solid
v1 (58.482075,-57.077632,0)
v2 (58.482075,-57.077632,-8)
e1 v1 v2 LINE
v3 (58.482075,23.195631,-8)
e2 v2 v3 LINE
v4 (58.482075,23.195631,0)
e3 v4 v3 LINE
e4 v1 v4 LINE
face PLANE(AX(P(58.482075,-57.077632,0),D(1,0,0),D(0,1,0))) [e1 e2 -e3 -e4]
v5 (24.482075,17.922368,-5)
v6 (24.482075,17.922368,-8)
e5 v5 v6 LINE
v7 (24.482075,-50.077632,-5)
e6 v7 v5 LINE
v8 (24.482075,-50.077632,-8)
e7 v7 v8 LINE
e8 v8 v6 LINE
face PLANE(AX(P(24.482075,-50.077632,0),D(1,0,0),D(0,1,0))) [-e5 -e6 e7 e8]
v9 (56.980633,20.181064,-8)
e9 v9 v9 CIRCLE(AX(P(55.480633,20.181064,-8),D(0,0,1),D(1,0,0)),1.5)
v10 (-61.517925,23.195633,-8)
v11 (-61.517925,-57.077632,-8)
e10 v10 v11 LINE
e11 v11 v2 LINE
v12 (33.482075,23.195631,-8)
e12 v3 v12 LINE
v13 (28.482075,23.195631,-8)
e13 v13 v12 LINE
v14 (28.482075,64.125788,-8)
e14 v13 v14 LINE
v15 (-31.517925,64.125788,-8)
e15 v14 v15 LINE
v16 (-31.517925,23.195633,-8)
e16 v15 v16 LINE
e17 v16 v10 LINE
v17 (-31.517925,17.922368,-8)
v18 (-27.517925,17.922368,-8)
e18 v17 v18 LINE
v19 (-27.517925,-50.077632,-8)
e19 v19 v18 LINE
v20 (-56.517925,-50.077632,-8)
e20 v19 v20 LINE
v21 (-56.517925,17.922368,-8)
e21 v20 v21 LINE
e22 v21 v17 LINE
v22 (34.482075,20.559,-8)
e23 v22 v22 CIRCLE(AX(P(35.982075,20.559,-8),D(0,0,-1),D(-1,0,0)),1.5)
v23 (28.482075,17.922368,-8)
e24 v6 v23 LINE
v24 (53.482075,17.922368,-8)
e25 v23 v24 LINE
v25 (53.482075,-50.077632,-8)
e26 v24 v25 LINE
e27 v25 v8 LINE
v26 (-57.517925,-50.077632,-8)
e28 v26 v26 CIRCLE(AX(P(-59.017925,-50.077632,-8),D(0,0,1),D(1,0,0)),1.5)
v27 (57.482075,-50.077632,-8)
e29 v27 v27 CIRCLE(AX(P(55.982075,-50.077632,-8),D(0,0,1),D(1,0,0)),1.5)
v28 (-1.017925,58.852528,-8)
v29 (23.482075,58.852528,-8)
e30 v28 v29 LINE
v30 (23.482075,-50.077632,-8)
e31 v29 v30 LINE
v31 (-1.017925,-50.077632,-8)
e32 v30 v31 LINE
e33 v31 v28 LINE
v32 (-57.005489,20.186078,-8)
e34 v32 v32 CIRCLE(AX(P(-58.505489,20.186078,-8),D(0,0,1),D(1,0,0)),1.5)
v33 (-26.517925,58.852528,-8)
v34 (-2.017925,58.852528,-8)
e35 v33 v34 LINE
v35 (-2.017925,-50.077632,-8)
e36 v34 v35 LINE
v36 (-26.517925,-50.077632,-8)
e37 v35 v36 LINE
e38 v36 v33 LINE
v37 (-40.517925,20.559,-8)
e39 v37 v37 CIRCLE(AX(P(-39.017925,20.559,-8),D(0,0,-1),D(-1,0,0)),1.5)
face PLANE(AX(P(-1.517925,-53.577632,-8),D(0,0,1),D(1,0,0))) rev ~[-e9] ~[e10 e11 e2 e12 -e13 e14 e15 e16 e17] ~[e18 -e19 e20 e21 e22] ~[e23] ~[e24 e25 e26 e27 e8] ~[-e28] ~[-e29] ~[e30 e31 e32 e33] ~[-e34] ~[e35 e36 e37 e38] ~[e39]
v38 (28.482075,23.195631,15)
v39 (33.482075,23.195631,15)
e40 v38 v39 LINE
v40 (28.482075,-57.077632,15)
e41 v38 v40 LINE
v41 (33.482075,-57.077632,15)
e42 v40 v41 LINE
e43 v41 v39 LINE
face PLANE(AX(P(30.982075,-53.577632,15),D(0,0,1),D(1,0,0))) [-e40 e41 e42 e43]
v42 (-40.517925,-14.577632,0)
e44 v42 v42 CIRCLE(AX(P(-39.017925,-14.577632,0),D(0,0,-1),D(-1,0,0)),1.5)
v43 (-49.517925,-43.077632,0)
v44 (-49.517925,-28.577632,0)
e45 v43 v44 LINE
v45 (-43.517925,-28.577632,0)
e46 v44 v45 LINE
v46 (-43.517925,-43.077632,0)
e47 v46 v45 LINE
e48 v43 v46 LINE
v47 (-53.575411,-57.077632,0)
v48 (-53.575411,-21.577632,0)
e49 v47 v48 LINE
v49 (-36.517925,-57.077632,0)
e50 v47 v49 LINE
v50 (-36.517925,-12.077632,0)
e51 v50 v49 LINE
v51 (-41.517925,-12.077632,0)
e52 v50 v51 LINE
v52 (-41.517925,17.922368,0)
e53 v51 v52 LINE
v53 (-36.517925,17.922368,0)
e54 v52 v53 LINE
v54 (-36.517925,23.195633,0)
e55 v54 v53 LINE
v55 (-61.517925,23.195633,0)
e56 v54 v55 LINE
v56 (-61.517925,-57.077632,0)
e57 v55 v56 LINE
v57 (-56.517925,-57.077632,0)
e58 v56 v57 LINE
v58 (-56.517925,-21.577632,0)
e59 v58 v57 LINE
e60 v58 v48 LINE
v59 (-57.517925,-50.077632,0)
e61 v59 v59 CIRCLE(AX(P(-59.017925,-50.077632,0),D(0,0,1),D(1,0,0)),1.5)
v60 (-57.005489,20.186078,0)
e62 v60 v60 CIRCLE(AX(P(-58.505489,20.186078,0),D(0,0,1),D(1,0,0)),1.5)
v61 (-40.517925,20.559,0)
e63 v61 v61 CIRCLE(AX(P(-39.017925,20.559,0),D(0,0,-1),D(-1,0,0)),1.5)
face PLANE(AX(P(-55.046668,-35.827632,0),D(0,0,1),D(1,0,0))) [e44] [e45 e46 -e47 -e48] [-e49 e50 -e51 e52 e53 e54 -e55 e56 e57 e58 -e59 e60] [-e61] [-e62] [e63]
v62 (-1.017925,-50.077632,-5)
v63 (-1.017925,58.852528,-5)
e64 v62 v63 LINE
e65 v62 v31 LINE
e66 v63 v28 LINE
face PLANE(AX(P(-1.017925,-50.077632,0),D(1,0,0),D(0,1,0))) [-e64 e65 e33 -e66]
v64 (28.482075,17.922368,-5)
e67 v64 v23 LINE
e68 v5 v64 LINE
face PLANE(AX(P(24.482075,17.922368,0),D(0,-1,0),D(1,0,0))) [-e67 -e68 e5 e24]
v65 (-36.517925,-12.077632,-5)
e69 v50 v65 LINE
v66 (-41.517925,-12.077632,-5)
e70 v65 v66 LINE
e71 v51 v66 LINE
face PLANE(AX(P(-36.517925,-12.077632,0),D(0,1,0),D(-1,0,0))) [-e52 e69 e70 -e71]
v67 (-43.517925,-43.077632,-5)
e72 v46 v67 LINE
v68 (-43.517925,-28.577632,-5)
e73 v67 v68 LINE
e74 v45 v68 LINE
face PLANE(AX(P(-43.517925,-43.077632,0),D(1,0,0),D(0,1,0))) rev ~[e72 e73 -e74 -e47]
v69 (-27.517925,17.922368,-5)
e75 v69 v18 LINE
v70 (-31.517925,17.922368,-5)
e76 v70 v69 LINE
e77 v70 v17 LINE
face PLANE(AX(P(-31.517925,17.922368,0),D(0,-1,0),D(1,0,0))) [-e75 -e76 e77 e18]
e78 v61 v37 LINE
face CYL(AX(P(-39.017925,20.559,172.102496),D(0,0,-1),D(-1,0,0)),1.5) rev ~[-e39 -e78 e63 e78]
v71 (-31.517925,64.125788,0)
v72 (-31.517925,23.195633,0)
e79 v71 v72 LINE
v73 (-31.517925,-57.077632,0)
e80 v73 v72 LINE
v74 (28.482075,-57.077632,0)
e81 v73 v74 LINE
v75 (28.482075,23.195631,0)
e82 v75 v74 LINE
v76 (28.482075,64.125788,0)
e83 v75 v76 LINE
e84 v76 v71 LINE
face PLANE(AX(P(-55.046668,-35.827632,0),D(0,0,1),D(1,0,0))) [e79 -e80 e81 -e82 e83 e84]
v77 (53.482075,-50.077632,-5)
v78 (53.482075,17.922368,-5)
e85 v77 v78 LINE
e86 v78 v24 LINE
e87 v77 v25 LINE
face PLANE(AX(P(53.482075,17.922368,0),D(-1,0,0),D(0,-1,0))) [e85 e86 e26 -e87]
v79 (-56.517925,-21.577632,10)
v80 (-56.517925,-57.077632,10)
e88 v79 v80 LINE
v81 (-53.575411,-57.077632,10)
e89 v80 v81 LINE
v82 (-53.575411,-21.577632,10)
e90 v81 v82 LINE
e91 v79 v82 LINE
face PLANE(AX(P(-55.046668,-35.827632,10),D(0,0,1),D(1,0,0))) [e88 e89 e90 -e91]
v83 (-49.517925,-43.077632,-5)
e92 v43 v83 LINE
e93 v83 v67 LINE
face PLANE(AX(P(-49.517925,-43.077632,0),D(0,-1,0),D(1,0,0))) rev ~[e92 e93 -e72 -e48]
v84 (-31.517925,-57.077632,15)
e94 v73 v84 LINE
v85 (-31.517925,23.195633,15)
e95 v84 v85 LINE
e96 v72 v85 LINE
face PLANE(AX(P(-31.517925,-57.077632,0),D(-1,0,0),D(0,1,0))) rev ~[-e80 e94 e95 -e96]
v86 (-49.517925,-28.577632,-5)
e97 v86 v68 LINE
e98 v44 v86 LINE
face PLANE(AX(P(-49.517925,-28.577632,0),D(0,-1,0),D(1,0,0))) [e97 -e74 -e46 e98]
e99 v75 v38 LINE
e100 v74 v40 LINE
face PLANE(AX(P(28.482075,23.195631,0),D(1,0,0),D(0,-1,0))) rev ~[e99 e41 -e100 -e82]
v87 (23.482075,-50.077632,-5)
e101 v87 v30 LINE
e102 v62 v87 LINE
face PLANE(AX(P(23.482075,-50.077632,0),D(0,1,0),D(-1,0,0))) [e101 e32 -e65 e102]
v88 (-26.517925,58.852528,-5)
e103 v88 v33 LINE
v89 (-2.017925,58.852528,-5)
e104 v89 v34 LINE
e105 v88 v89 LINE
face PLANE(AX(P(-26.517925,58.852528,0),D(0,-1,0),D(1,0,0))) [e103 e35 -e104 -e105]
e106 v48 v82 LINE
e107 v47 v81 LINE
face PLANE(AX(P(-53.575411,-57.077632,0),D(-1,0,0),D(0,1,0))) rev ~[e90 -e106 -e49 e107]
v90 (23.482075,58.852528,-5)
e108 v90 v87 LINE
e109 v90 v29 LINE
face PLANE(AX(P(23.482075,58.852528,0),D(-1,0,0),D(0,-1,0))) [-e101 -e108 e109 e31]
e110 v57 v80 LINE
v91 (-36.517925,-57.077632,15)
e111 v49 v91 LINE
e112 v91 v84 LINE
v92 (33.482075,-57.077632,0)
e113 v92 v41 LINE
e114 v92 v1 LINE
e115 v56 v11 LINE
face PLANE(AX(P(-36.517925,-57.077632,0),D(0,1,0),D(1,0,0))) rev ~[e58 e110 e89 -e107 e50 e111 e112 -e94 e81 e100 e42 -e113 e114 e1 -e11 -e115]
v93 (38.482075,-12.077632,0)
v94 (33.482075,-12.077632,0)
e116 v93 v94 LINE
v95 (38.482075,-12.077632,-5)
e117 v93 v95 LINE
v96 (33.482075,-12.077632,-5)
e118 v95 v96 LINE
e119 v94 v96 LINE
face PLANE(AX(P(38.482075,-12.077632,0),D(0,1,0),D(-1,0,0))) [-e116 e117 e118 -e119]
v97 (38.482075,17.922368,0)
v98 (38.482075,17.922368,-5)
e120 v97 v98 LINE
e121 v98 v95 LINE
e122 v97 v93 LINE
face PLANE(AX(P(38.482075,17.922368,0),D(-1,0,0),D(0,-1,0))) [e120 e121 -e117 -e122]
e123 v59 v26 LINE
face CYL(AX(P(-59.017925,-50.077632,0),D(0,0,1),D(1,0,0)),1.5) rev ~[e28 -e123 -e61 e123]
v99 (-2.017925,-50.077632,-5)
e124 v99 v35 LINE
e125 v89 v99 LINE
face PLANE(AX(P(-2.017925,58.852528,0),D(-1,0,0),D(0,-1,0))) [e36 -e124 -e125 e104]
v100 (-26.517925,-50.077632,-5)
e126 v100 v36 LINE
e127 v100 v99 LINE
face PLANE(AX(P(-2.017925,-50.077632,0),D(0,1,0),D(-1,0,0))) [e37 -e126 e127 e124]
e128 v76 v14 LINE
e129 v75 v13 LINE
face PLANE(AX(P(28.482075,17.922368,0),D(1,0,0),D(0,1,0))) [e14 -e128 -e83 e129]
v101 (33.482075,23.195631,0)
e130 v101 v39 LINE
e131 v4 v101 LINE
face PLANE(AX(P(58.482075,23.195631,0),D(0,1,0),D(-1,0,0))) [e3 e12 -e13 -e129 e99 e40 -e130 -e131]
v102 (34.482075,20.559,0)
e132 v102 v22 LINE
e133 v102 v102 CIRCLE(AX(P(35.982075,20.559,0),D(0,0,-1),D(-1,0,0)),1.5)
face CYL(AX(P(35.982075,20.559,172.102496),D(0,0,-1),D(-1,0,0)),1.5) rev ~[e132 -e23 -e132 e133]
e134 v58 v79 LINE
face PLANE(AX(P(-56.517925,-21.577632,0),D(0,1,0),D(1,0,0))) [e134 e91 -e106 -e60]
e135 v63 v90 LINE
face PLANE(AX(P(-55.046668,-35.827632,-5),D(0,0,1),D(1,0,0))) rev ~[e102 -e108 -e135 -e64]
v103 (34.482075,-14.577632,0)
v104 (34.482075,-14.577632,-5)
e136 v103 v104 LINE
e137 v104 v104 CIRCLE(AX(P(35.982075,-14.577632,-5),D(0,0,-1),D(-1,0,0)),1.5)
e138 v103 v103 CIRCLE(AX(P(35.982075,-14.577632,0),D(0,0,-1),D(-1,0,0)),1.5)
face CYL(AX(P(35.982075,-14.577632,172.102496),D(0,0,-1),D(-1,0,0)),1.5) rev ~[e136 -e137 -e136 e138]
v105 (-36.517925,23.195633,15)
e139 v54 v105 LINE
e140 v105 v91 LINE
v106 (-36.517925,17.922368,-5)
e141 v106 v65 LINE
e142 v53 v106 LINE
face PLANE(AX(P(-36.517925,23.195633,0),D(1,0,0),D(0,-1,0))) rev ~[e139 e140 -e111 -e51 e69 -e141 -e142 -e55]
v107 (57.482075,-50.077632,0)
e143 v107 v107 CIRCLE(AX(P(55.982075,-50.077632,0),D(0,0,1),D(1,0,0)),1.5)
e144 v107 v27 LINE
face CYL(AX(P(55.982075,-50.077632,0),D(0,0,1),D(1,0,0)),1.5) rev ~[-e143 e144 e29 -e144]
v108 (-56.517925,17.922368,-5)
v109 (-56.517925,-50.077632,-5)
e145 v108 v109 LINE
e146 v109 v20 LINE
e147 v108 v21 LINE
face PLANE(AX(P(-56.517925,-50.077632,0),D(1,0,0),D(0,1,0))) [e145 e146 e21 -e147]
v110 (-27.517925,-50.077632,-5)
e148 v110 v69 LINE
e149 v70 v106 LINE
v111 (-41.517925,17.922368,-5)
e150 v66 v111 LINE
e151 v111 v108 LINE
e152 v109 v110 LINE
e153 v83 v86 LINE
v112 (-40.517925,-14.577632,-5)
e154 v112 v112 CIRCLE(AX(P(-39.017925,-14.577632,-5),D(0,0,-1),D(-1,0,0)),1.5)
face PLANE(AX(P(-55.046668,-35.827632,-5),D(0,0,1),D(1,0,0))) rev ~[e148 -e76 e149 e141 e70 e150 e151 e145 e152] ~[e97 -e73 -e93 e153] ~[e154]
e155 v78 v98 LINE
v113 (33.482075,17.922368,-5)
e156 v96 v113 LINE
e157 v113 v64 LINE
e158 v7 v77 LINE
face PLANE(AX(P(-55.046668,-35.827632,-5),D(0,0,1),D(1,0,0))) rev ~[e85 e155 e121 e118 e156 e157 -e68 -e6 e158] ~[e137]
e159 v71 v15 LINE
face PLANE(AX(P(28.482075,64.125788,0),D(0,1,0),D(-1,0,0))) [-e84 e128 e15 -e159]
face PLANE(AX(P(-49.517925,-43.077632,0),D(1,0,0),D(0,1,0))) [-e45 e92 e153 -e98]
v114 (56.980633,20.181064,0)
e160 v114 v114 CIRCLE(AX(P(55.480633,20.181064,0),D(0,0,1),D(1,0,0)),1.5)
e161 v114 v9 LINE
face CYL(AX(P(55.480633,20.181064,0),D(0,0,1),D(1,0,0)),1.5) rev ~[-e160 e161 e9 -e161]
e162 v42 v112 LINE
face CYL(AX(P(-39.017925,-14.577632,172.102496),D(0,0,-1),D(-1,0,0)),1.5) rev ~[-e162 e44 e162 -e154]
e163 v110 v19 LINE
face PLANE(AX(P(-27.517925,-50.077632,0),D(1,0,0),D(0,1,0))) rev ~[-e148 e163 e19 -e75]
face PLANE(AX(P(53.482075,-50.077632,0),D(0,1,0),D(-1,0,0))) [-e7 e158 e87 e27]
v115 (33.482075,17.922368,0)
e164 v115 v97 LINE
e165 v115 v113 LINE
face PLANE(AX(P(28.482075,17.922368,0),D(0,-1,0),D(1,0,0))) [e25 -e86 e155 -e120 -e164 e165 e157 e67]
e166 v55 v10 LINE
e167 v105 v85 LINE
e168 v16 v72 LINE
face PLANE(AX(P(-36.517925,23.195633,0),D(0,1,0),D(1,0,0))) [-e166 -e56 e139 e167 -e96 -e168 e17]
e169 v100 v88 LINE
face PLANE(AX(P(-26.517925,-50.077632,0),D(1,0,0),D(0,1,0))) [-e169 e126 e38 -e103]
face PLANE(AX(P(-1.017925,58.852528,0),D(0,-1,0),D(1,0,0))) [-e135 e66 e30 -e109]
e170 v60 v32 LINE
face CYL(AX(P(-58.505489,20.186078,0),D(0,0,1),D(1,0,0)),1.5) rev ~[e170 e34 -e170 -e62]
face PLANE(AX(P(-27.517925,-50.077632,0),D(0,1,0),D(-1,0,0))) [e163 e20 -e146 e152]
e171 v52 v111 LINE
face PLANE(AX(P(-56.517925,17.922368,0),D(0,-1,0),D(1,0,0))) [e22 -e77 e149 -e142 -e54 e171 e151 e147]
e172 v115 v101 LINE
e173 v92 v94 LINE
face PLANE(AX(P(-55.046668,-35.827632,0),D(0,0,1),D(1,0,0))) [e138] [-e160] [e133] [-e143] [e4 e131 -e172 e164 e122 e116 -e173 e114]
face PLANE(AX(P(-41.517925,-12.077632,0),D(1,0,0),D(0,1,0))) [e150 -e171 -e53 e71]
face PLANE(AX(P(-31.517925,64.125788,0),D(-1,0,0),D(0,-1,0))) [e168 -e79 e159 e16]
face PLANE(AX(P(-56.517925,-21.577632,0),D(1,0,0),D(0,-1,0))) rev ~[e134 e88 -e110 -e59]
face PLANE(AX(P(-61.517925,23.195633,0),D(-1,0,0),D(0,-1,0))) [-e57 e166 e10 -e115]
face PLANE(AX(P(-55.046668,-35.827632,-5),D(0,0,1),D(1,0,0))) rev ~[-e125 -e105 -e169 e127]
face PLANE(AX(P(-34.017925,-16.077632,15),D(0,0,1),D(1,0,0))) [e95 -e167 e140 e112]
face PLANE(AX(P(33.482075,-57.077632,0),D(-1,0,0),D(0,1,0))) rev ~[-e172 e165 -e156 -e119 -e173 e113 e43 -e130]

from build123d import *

# Parameters (mm, degrees)
F0_W     = 2.9425137265
F0_H     = 28.5
F0_W_2   = 6
F0_H_2   = 14.5
F0_W_3   = 4
F0_H_3   = 68
F0_W_4   = 1
F1_DEPTH = 5
F0_R     = 1.5
F0_W_5   = 5
F0_H_4   = 5.2732650286
F0_H_5   = 7
F0_W_6   = 17.0574862735
F0_H_6   = 5.2732627955
F2_DEPTH = 8
F3_DEPTH = 15
F4_DEPTH = 10
F5_D     = 3


# Not quite as in the source:
# - a feature names something its author has since deleted; it is built from what else it names


with BuildPart() as f1:
    # F0 (on Top) → F1 (new body)
    with BuildSketch(Plane.XY):
        with Locations((-55.0466683022, -35.8276315331)):
            Rectangle(F0_W, F0_H)
        Polygon((-53.5754114389, -21.5776315331), (-53.5754114389, -50.0776315331), (-36.5179251655, -50.0776315331), (-36.5179251655, -12.0776315331), (-41.5179251655, -12.0776315331), (-41.5179251655, 17.9223684669), (-56.5179251655, 17.9223684669), (-56.5179251655, -21.5776315331), align=None)
        with Locations((-46.5179251655, -35.8276315331)):
            Rectangle(F0_W_2, F0_H_2, mode=Mode.SUBTRACT)
        Polygon((-36.5179251655, -12.0776315331), (-36.5179251655, -50.0776315331), (-31.5179251655, -50.0776315331), (-31.5179251655, 17.9223684669), (-36.5179251655, 17.9223684669), align=None)
        with Locations((-29.5179251655, -16.0776315331)):
            Rectangle(F0_W_3, F0_H_3)
        with Locations((-27.0179251655, -16.0776315331)):
            Rectangle(F0_W_4, F0_H_3)
        Polygon((-31.5179251655, 23.1956334954), (-31.5179251655, 17.9223684669), (-27.5179251655, 17.9223684669), (-26.5179251655, 17.9223684669), (-26.5179251655, 58.8525284669), (-2.0179251655, 58.8525284669), (-1.5179251655, 58.8525284669), (-1.0179251655, 58.8525284669), (23.4820748345, 58.8525284669), (23.4820748345, 17.9223684669), (24.4820748345, 17.9223684669), (28.4820748345, 17.9223684669), (28.4820748345, 23.1956312623), (28.4820748345, 64.1257884669), (-31.5179251655, 64.1257884669), align=None)
        Polygon((-26.5179251655, 17.9223684669), (-26.5179251655, -50.0776315331), (-2.0179251655, -50.0776315331), (-2.0179251655, 58.8525284669), (-26.5179251655, 58.8525284669), align=None)
        Polygon((-2.0179251655, 58.8525284669), (-2.0179251655, -50.0776315331), (-1.0179251655, -50.0776315331), (-1.0179251655, 58.8525284669), (-1.5179251655, 58.8525284669), align=None)
        Polygon((28.4820748345, 17.9223684669), (28.4820748345, -50.0776315331), (33.4820748345, -50.0776315331), (33.4820748345, -17.0776315331), (33.4820748345, -12.0776315331), (33.4820748345, 17.9223684669), align=None)
        with Locations((26.4820748345, -16.0776315331)):
            Rectangle(F0_W_3, F0_H_3)
        Polygon((-1.0179251655, 58.8525284669), (-1.0179251655, -50.0776315331), (23.4820748345, -50.0776315331), (23.4820748345, 17.9223684669), (23.4820748345, 58.8525284669), align=None)
        Polygon((33.4820748345, -17.0776315331), (33.4820748345, -50.0776315331), (53.4820748345, -50.0776315331), (53.4820748345, 17.9223684669), (38.4820748345, 17.9223684669), (38.4820748345, -12.0776315331), (33.4820748345, -12.0776315331), align=None)
        with Locations((23.9820748345, -16.0776315331)):
            Rectangle(F0_W_4, F0_H_3)
    extrude(amount=-F1_DEPTH)

    # F0 (on Top) → F2 (join)
    with BuildSketch(Plane.XY):
        Polygon((-27.5179251655, -50.0776315331), (-31.5179251655, -50.0776315331), (-31.5179251655, -57.0776315331), (28.4820748345, -57.0776315331), (28.4820748345, -50.0776315331), (24.4820748345, -50.0776315331), (23.4820748345, -50.0776315331), (-1.0179251655, -50.0776315331), (-2.0179251655, -50.0776315331), (-26.5179251655, -50.0776315331), align=None)
        Polygon((-56.5179251655, -57.0776315331), (-56.5179251655, -50.0776315331), (-56.5179251655, -21.5776315331), (-56.5179251655, 17.9223684669), (-41.5179251655, 17.9223684669), (-36.5179251655, 17.9223684669), (-36.5179251655, 23.1956334954), (-61.5179251655, 23.1956334954), (-61.5179251655, -57.0776315331), align=None)
        with Locations((-59.0179251655, -50.0776315331)):
            Circle(F0_R, mode=Mode.SUBTRACT)
        with Locations((-58.5054894246, 20.1860783767)):
            Circle(F0_R, mode=Mode.SUBTRACT)
        Polygon((33.4820748345, -50.0776315331), (33.4820748345, -57.0776315331), (58.4820748345, -57.0776315331), (58.4820748345, 23.1956312623), (33.4820748345, 23.1956312623), (33.4820748345, 17.9223684669), (38.4820748345, 17.9223684669), (53.4820748345, 17.9223684669), (53.4820748345, -50.0776315331), align=None)
        with Locations((55.9820748345, -50.0776315331)):
            Circle(F0_R, mode=Mode.SUBTRACT)
        with Locations((55.4806331986, 20.1810636766)):
            Circle(F0_R, mode=Mode.SUBTRACT)
        with Locations((-34.0179251655, 20.5590009811)):
            Rectangle(F0_W_5, F0_H_4)
        with Locations((-55.0466683022, -53.5776315331)):
            Rectangle(F0_W, F0_H_5)
        with Locations((-45.0466683022, -53.5776315331)):
            Rectangle(F0_W_6, F0_H_5)
        with Locations((-34.0179251655, -53.5776315331)):
            Rectangle(F0_W_5, F0_H_5)
        with Locations((30.9820748345, -53.5776315331)):
            Rectangle(F0_W_5, F0_H_5)
        with Locations((-27.0179251655, -16.0776315331)):
            Rectangle(F0_W_4, F0_H_3)
        with Locations((23.9820748345, -16.0776315331)):
            Rectangle(F0_W_4, F0_H_3)
        Polygon((-2.0179251655, 58.8525284669), (-2.0179251655, -50.0776315331), (-1.0179251655, -50.0776315331), (-1.0179251655, 58.8525284669), (-1.5179251655, 58.8525284669), align=None)
        with Locations((30.9820748345, 20.5589998646)):
            Rectangle(F0_W_5, F0_H_6)
        with Locations((-34.0179251655, 20.5590009811)):
            Rectangle(F0_W_5, F0_H_4)
        Polygon((-31.5179251655, 23.1956334954), (-31.5179251655, 17.9223684669), (-27.5179251655, 17.9223684669), (-26.5179251655, 17.9223684669), (-26.5179251655, 58.8525284669), (-2.0179251655, 58.8525284669), (-1.5179251655, 58.8525284669), (-1.0179251655, 58.8525284669), (23.4820748345, 58.8525284669), (23.4820748345, 17.9223684669), (24.4820748345, 17.9223684669), (28.4820748345, 17.9223684669), (28.4820748345, 23.1956312623), (28.4820748345, 64.1257884669), (-31.5179251655, 64.1257884669), align=None)
        with Locations((30.9820748345, 20.5589998646)):
            Rectangle(F0_W_5, F0_H_6)
        with Locations((-34.0179251655, 20.5590009811)):
            Rectangle(F0_W_5, F0_H_4)
    extrude(amount=-F2_DEPTH)

    # F0 (on Top) → F3 (join)
    with BuildSketch(Plane.XY):
        Polygon((-36.5179251655, -12.0776315331), (-36.5179251655, -50.0776315331), (-31.5179251655, -50.0776315331), (-31.5179251655, 17.9223684669), (-36.5179251655, 17.9223684669), align=None)
        with Locations((-34.0179251655, -53.5776315331)):
            Rectangle(F0_W_5, F0_H_5)
        with Locations((-34.0179251655, 20.5590009811)):
            Rectangle(F0_W_5, F0_H_4)
        with Locations((30.9820748345, -53.5776315331)):
            Rectangle(F0_W_5, F0_H_5)
        Polygon((28.4820748345, 17.9223684669), (28.4820748345, -50.0776315331), (33.4820748345, -50.0776315331), (33.4820748345, -17.0776315331), (33.4820748345, -12.0776315331), (33.4820748345, 17.9223684669), align=None)
        with Locations((30.9820748345, 20.5589998646)):
            Rectangle(F0_W_5, F0_H_6)
    extrude(amount=F3_DEPTH)

    # F0 (on Top) → F4 (join)
    with BuildSketch(Plane.XY):
        with Locations((-55.0466683022, -35.8276315331)):
            Rectangle(F0_W, F0_H)
        with Locations((-55.0466683022, -53.5776315331)):
            Rectangle(F0_W, F0_H_5)
    extrude(amount=F4_DEPTH)

    # F5 (through all)
    with Locations(Plane.XY):
        with Locations((35.9820748345, 20.5589998646), (35.9820748345, -14.5776315331), (-39.0179251655, 20.5589998646), (-39.0179251655, -14.5776315331)):
            Hole(F5_D / 2)


solid = f1.part
